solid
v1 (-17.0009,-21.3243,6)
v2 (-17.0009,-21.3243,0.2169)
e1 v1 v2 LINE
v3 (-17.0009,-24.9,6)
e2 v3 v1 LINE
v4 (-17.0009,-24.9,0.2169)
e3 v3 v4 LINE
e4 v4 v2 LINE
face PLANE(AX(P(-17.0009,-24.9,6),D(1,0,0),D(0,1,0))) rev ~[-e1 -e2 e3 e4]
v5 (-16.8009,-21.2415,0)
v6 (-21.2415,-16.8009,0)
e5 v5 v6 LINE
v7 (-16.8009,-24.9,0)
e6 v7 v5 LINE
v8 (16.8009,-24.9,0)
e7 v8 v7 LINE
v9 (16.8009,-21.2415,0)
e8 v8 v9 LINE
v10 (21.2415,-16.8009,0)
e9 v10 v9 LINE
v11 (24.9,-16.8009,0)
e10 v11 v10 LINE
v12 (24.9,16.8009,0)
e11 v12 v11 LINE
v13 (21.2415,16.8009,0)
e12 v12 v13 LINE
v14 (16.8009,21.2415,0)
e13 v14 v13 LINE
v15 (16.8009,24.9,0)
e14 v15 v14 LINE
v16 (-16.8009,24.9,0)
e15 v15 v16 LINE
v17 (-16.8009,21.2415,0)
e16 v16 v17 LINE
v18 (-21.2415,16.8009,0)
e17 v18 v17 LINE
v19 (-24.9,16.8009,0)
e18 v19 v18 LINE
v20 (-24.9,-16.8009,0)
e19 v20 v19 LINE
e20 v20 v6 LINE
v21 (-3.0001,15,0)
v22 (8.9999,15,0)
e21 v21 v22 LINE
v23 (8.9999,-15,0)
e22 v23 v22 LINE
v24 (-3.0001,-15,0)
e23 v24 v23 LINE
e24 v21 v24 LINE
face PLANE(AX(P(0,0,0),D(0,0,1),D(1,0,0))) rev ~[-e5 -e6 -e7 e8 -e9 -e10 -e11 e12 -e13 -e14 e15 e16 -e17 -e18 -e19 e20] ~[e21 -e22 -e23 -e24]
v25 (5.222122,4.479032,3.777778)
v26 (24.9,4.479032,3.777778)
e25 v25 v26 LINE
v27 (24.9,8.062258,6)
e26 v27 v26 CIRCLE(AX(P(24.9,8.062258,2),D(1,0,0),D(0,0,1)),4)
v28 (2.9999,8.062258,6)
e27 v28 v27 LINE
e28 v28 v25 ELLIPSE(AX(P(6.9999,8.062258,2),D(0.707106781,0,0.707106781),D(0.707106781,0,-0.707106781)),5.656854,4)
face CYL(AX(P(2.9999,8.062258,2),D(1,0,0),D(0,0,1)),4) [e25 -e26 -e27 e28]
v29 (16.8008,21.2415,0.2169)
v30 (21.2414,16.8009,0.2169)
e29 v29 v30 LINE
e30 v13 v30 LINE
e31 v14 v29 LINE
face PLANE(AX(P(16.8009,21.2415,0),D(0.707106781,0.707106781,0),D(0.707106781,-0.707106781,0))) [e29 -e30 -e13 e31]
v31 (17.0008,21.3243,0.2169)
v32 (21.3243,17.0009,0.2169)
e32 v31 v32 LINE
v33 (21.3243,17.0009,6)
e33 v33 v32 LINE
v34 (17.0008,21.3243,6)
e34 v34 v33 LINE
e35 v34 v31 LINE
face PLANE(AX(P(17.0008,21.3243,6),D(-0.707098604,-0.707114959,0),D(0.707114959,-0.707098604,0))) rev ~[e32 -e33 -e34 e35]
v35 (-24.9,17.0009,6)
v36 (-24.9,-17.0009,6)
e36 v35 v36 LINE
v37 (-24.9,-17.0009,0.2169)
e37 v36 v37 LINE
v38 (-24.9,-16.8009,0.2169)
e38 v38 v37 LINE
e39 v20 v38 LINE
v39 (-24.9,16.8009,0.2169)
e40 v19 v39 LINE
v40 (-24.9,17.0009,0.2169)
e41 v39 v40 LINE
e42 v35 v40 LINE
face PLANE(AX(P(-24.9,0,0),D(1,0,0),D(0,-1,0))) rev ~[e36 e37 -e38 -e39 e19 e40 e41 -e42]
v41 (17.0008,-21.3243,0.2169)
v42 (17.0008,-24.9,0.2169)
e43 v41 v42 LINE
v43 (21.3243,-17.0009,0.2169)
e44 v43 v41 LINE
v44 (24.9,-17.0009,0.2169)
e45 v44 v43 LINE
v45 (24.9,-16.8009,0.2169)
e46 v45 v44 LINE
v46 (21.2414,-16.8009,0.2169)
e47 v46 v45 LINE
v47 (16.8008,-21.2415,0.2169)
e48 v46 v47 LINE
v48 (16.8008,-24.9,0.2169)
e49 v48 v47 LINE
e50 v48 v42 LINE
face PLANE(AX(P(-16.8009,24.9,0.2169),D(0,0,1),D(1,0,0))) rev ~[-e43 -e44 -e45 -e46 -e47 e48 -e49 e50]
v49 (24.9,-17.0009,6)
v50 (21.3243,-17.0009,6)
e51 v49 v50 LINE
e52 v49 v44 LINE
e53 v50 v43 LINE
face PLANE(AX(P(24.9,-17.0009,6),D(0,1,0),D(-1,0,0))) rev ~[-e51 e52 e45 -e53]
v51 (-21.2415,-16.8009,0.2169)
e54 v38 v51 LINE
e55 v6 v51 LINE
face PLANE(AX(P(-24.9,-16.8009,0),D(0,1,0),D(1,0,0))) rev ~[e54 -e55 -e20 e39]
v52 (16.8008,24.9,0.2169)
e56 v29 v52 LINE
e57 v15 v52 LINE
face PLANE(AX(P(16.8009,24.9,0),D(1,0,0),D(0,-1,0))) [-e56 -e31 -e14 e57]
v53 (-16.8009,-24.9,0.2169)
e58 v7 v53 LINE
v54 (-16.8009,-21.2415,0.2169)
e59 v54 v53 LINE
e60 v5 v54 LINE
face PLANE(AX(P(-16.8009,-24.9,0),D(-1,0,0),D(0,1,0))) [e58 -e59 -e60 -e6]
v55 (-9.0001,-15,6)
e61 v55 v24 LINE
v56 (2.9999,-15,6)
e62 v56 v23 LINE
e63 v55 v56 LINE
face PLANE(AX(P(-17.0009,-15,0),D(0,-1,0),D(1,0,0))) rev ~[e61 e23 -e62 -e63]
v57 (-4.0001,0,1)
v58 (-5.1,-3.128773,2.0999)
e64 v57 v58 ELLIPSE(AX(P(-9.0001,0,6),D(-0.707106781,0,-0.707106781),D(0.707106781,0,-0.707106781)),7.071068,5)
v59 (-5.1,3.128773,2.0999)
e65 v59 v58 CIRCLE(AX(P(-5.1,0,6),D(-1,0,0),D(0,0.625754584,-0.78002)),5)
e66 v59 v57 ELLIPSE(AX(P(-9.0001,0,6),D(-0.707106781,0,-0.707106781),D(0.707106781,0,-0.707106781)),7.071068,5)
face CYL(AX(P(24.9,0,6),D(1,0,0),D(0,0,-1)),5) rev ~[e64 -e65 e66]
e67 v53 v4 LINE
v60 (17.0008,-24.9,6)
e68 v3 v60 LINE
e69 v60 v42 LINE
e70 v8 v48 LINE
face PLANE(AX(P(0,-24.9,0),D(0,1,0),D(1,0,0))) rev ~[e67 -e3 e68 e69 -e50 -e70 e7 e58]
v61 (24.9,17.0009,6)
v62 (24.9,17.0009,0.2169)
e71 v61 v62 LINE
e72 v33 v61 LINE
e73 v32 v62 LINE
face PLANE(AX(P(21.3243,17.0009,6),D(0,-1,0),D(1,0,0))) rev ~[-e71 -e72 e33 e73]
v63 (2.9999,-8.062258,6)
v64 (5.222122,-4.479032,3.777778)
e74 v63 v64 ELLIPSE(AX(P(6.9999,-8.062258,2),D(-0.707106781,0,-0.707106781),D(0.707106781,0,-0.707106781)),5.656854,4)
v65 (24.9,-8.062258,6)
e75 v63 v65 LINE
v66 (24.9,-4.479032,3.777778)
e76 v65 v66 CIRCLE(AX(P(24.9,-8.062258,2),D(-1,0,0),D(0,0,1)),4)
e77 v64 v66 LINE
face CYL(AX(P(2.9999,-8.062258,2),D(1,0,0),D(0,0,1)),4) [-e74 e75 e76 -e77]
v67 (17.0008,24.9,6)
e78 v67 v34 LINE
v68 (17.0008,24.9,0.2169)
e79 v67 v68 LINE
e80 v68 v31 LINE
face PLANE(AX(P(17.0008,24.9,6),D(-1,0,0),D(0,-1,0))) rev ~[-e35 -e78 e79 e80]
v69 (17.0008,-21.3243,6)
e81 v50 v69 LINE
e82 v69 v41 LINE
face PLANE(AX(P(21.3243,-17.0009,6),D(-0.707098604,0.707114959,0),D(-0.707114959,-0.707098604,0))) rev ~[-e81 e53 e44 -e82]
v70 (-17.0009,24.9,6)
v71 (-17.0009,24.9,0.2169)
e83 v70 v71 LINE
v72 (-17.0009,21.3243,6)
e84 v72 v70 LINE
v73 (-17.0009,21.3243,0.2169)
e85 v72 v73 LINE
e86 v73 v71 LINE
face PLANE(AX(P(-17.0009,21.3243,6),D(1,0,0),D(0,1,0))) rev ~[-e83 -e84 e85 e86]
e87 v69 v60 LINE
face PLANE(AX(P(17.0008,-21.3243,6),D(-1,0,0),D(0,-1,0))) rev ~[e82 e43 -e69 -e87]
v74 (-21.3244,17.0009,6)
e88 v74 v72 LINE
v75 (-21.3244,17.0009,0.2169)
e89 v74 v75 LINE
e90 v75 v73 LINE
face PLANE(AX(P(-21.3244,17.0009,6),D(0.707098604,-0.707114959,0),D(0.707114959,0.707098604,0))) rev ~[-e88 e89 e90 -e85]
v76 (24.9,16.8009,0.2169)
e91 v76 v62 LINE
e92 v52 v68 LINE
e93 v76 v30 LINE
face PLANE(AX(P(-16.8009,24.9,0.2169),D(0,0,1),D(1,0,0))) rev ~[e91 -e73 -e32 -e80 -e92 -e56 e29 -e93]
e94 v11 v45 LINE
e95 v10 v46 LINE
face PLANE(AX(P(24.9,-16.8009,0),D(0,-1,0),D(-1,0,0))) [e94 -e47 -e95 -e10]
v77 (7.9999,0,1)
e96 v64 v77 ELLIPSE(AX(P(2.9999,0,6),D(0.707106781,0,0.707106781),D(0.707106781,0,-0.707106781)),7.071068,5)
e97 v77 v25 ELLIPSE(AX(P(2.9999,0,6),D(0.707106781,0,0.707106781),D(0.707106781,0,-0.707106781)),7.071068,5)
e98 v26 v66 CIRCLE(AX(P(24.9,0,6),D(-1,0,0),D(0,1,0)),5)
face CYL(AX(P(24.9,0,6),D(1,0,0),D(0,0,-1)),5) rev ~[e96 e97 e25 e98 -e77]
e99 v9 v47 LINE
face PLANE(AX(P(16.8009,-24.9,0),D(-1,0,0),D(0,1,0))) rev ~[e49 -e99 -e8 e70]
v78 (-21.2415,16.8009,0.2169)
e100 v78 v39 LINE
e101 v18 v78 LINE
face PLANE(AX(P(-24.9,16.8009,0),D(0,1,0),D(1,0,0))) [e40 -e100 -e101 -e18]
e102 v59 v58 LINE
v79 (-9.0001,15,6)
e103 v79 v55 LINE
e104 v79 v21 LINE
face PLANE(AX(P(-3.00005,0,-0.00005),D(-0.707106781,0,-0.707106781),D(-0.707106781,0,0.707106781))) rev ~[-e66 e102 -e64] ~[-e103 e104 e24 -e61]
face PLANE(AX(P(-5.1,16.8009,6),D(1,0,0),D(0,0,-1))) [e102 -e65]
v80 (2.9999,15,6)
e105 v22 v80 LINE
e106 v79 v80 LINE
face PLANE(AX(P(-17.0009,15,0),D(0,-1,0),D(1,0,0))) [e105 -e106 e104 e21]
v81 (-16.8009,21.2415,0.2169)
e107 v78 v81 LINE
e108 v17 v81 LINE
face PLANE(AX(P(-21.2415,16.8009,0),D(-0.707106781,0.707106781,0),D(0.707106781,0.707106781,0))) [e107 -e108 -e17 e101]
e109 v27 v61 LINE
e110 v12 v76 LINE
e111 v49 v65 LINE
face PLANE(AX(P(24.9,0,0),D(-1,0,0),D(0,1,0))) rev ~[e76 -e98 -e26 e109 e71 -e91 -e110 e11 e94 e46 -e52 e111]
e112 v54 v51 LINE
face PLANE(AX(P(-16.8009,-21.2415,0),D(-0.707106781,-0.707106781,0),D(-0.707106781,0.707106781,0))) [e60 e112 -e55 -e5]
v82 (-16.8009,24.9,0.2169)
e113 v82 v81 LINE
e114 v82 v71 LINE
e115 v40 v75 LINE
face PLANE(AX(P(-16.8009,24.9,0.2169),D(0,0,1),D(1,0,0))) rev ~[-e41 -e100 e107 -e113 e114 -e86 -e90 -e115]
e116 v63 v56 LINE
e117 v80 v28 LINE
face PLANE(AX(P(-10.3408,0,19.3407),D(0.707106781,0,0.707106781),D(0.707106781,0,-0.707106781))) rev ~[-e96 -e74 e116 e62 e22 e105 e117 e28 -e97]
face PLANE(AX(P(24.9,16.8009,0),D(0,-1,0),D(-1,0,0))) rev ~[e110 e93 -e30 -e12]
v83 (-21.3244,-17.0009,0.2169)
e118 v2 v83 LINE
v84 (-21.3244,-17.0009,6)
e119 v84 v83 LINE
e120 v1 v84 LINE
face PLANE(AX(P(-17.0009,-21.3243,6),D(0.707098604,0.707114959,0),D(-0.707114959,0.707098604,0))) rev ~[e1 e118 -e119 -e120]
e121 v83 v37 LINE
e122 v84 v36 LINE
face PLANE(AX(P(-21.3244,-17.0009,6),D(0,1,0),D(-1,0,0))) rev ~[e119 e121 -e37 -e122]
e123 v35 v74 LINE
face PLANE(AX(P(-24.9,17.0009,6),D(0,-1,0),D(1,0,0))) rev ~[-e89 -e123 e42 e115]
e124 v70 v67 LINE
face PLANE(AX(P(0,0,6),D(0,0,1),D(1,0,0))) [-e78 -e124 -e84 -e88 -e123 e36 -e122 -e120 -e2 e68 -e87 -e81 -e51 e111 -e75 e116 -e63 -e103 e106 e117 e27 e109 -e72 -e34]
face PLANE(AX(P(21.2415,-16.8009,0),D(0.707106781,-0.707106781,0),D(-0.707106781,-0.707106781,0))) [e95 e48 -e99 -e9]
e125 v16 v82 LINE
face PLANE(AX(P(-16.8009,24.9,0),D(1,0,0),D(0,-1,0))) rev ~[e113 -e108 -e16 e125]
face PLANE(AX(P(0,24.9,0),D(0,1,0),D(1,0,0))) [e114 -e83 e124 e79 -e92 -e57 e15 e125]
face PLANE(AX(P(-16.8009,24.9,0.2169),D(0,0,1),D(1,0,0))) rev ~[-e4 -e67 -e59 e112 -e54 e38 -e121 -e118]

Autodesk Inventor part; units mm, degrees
ref_plane "Work Plane1" through (-29.1, -14.5, 2.4) normal (0, 0, -1) x (0, 1, 0)
ref_plane "Work Plane2" through (-13.8999, -10.5497, 2.25) normal (0, 0, -1) x (0, 1, 0)
sketch "Sketch1" plane through (0, 0, 0) normal (0, 0, 1) x (1, 0, 0)
  line L0 (-34.86, 0) -> (34.86, 0) construction
  line L1 (0, -34.86) -> (0, 34.86) construction
  line L2 (0, 0) -> (11.1575, 11.1575) construction
  line L3 (0, 0) -> (15.7791, 0) construction
  line L4 (0, 24.9) -> (16.8009, 24.9)
  line L5 (16.8009, 24.9) -> (16.8009, 21.2415)
  line L6 (16.8009, 21.2415) -> (19.0212, 19.0212)
  line L7 (24.9, 0) -> (24.9, 16.8009)
  line L8 (24.9, 16.8009) -> (21.2415, 16.8009)
  line L9 (21.2415, 16.8009) -> (19.0212, 19.0212)
  line L10 (0, -24.9) -> (16.8009, -24.9)
  line L11 (16.8009, -24.9) -> (16.8009, -21.2415)
  line L12 (16.8009, -21.2415) -> (19.0212, -19.0212)
  line L13 (24.9, 0) -> (24.9, -16.8009)
  line L14 (24.9, -16.8009) -> (21.2415, -16.8009)
  line L15 (21.2415, -16.8009) -> (19.0212, -19.0212)
  line L16 (0, 24.9) -> (-16.8009, 24.9)
  line L17 (-16.8009, 24.9) -> (-16.8009, 21.2415)
  line L18 (-16.8009, 21.2415) -> (-19.0212, 19.0212)
  line L19 (-24.9, 16.8009) -> (-21.2415, 16.8009)
  line L20 (-21.2415, 16.8009) -> (-19.0212, 19.0212)
  line L21 (0, -24.9) -> (-16.8009, -24.9)
  line L22 (-16.8009, -24.9) -> (-16.8009, -21.2415)
  line L23 (-16.8009, -21.2415) -> (-19.0212, -19.0212)
  line L24 (-21.2415, -16.8009) -> (-19.0212, -19.0212)
  line L25 (-24.9, -16.8009) -> (-21.2415, -16.8009)
  line L26 (-24.9, 0) -> (-24.9, -16.8009)
  line L27 (-24.9, 0) -> (-24.9, 16.8009)
  circle A0 centre (0, 0) radius 3
  dimension "d0" = 45
  dimension "d2" = 24.9
  dimension "d3" = 3.14
  dimension "d4" = 26.9
  dimension "d5" = 6
extrude "Extrusion1" add sketch "Sketch1" along normal blind 6
ref_plane "Work Plane4" through (-16.9391, -17.02, 0.2169) normal (0, 0, 1) x (1, 0, 0)
sketch "Skizze6" plane through (-16.8009, 24.9, 6) normal (0, 0, 1) x (1, 0, 0)
  circle A0 centre (6.8009, -18) radius 1.65 construction
  circle A1 centre (3.0009, -24.9) radius 1.65 construction
  circle A2 centre (26.5009, -34.9) radius 1.65 construction
  circle A3 centre (26.5009, -14.9) radius 1.65 construction
  circle A4 centre (16.8009, -24.9) radius 10 construction
  line L0 (33.6017, -3.6585) -> (33.6017, 0) projected
  line L1 (33.6017, 0) -> (0, 0) construction
  line L2 (0, 0) -> (0, -3.6585) projected
  line L3 (0, -3.6585) -> (-4.4406, -8.0991) projected
  line L4 (-4.4406, -8.0991) -> (-8.0991, -8.0991) projected
  line L5 (-8.0991, -8.0991) -> (-8.0991, -41.7009) construction
  line L6 (-8.0991, -41.7009) -> (-4.4406, -41.7009) projected
  line L7 (-4.4406, -41.7009) -> (0, -46.1415) projected
  line L8 (0, -46.1415) -> (0, -49.8) projected
  line L9 (0, -49.8) -> (33.6017, -49.8) construction
  line L10 (33.6017, -49.8) -> (33.6017, -46.1415) projected
  line L11 (33.6017, -46.1415) -> (38.0423, -41.7009) projected
  line L12 (38.0423, -41.7009) -> (41.7009, -41.7009) projected
  line L13 (41.7009, -41.7009) -> (41.7009, -8.0991) construction
  line L14 (41.7009, -8.0991) -> (38.0423, -8.0991) projected
  line L15 (38.0423, -8.0991) -> (33.6017, -3.6585) projected
  line L16 (-0.2, 0.2) -> (33.8017, 0.2) construction
  line L17 (33.8017, 0.2) -> (33.8017, -3.5757)
  line L18 (33.8017, -3.5757) -> (38.1252, -7.8991)
  line L19 (38.1252, -7.8991) -> (41.9009, -7.8991)
  line L20 (41.9009, -7.8991) -> (41.9009, -41.9009) construction
  line L21 (41.9009, -41.9009) -> (38.1252, -41.9009)
  line L22 (38.1252, -41.9009) -> (33.8017, -46.2243)
  line L23 (33.8017, -46.2243) -> (33.8017, -50)
  line L24 (33.8017, -50) -> (-0.2, -50) construction
  line L25 (-0.2, -50) -> (-0.2, -46.2243)
  line L26 (-0.2, -46.2243) -> (-4.5235, -41.9009)
  line L27 (-4.5235, -41.9009) -> (-8.2991, -41.9009)
  line L28 (-8.2991, -41.9009) -> (-8.2991, -7.8991) construction
  line L29 (-8.2991, -7.8991) -> (-4.5235, -7.8991)
  line L30 (-4.5235, -7.8991) -> (-0.2, -3.5757)
  line L31 (-0.2, -3.5757) -> (-0.2, 0.2)
  line L32 (-8.0991, -8.0991) -> (-8.0991, -7.8991)
  line L33 (0, 0) -> (-0.2, 0)
  line L34 (33.6017, 0) -> (33.8017, 0)
  line L35 (41.7009, -8.0991) -> (38.0423, -8.0991) projected
  line L36 (41.7009, -8.0991) -> (41.7009, -7.8991)
  line L37 (41.7009, -41.7009) -> (41.7009, -41.9009)
  line L38 (33.6017, -49.8) -> (33.8017, -49.8)
  line L39 (-8.0991, -41.7009) -> (-8.0991, -41.9009)
  line L40 (0, -49.8) -> (-0.2, -49.8)
  point P0 (16.8009, -24.9)
  dimension "d25" = 0.2
extrude "IM_offset" add sketch "Skizze6" against normal up to surface (5.7831 mm away)
ref_plane "Work Plane3" through (-17.0009, 0, 0) normal (0, -1, 0) x (1, 0, 0)
sketch "Sketch7" plane through (-17.0009, 0, 0) normal (0, -1, 0) x (1, 0, 0)
  line L0 (6.6601, 19.3407) -> (38.4799, -12.4791)
  line L1 (38.4799, -12.4791) -> (32.4799, -18.4791)
  line L2 (32.4799, -18.4791) -> (0.6601, 13.3407)
  line L3 (0.6601, 13.3407) -> (6.6601, 19.3407)
  line L4 (6.6601, 19.3407) -> (51.6601, 19.3407) construction
  line L5 (14.0009, 6) -> (20.0009, 6) projected
  line L6 (20.0009, 0) -> (14.0009, 0) projected
  point P0 (17.0009, 0)
  dimension "d28" = 45
  dimension "d29" = 45
extrude "Extrusion6" cut sketch "Sketch7" along normal mid plane 30
sketch "Sketch8" plane through (24.9, 16.8009, 6) normal (1, 0, 0) x (0, 0, -1)
  line L0 (6, 0) -> (6, -33.6017) projected
  line L1 (0, -33.8017) -> (0, 0.2) projected
  line L2 (0, -33.8017) -> (5.7831, -33.8017) projected
  circle A0 centre (0, -16.8009) radius 5
  line L3 (0, 0.2) -> (5.7831, 0.2) projected
  line L4 (6, 0) -> (5.7831, 0) projected
  line L5 (5.7831, 0.2) -> (5.7831, 0) projected
  line L6 (5.7831, -33.6017) -> (5.7831, -33.8017) projected
  line L7 (6, -33.6017) -> (5.7831, -33.6017) projected
  point P0 (6, -16.8009)
  dimension "d32" = 10
extrude "Extrusion7" cut sketch "Sketch8" against normal blind 30 contours A0 L1 | L1 A0
fillet "Fillet1" radius 4 2 edges at (13.95, 5, 6) (13.95, -5, 6)
properties part number "20_Cube_insert_Fluorescence_Darkfield_Mirror_v3"
